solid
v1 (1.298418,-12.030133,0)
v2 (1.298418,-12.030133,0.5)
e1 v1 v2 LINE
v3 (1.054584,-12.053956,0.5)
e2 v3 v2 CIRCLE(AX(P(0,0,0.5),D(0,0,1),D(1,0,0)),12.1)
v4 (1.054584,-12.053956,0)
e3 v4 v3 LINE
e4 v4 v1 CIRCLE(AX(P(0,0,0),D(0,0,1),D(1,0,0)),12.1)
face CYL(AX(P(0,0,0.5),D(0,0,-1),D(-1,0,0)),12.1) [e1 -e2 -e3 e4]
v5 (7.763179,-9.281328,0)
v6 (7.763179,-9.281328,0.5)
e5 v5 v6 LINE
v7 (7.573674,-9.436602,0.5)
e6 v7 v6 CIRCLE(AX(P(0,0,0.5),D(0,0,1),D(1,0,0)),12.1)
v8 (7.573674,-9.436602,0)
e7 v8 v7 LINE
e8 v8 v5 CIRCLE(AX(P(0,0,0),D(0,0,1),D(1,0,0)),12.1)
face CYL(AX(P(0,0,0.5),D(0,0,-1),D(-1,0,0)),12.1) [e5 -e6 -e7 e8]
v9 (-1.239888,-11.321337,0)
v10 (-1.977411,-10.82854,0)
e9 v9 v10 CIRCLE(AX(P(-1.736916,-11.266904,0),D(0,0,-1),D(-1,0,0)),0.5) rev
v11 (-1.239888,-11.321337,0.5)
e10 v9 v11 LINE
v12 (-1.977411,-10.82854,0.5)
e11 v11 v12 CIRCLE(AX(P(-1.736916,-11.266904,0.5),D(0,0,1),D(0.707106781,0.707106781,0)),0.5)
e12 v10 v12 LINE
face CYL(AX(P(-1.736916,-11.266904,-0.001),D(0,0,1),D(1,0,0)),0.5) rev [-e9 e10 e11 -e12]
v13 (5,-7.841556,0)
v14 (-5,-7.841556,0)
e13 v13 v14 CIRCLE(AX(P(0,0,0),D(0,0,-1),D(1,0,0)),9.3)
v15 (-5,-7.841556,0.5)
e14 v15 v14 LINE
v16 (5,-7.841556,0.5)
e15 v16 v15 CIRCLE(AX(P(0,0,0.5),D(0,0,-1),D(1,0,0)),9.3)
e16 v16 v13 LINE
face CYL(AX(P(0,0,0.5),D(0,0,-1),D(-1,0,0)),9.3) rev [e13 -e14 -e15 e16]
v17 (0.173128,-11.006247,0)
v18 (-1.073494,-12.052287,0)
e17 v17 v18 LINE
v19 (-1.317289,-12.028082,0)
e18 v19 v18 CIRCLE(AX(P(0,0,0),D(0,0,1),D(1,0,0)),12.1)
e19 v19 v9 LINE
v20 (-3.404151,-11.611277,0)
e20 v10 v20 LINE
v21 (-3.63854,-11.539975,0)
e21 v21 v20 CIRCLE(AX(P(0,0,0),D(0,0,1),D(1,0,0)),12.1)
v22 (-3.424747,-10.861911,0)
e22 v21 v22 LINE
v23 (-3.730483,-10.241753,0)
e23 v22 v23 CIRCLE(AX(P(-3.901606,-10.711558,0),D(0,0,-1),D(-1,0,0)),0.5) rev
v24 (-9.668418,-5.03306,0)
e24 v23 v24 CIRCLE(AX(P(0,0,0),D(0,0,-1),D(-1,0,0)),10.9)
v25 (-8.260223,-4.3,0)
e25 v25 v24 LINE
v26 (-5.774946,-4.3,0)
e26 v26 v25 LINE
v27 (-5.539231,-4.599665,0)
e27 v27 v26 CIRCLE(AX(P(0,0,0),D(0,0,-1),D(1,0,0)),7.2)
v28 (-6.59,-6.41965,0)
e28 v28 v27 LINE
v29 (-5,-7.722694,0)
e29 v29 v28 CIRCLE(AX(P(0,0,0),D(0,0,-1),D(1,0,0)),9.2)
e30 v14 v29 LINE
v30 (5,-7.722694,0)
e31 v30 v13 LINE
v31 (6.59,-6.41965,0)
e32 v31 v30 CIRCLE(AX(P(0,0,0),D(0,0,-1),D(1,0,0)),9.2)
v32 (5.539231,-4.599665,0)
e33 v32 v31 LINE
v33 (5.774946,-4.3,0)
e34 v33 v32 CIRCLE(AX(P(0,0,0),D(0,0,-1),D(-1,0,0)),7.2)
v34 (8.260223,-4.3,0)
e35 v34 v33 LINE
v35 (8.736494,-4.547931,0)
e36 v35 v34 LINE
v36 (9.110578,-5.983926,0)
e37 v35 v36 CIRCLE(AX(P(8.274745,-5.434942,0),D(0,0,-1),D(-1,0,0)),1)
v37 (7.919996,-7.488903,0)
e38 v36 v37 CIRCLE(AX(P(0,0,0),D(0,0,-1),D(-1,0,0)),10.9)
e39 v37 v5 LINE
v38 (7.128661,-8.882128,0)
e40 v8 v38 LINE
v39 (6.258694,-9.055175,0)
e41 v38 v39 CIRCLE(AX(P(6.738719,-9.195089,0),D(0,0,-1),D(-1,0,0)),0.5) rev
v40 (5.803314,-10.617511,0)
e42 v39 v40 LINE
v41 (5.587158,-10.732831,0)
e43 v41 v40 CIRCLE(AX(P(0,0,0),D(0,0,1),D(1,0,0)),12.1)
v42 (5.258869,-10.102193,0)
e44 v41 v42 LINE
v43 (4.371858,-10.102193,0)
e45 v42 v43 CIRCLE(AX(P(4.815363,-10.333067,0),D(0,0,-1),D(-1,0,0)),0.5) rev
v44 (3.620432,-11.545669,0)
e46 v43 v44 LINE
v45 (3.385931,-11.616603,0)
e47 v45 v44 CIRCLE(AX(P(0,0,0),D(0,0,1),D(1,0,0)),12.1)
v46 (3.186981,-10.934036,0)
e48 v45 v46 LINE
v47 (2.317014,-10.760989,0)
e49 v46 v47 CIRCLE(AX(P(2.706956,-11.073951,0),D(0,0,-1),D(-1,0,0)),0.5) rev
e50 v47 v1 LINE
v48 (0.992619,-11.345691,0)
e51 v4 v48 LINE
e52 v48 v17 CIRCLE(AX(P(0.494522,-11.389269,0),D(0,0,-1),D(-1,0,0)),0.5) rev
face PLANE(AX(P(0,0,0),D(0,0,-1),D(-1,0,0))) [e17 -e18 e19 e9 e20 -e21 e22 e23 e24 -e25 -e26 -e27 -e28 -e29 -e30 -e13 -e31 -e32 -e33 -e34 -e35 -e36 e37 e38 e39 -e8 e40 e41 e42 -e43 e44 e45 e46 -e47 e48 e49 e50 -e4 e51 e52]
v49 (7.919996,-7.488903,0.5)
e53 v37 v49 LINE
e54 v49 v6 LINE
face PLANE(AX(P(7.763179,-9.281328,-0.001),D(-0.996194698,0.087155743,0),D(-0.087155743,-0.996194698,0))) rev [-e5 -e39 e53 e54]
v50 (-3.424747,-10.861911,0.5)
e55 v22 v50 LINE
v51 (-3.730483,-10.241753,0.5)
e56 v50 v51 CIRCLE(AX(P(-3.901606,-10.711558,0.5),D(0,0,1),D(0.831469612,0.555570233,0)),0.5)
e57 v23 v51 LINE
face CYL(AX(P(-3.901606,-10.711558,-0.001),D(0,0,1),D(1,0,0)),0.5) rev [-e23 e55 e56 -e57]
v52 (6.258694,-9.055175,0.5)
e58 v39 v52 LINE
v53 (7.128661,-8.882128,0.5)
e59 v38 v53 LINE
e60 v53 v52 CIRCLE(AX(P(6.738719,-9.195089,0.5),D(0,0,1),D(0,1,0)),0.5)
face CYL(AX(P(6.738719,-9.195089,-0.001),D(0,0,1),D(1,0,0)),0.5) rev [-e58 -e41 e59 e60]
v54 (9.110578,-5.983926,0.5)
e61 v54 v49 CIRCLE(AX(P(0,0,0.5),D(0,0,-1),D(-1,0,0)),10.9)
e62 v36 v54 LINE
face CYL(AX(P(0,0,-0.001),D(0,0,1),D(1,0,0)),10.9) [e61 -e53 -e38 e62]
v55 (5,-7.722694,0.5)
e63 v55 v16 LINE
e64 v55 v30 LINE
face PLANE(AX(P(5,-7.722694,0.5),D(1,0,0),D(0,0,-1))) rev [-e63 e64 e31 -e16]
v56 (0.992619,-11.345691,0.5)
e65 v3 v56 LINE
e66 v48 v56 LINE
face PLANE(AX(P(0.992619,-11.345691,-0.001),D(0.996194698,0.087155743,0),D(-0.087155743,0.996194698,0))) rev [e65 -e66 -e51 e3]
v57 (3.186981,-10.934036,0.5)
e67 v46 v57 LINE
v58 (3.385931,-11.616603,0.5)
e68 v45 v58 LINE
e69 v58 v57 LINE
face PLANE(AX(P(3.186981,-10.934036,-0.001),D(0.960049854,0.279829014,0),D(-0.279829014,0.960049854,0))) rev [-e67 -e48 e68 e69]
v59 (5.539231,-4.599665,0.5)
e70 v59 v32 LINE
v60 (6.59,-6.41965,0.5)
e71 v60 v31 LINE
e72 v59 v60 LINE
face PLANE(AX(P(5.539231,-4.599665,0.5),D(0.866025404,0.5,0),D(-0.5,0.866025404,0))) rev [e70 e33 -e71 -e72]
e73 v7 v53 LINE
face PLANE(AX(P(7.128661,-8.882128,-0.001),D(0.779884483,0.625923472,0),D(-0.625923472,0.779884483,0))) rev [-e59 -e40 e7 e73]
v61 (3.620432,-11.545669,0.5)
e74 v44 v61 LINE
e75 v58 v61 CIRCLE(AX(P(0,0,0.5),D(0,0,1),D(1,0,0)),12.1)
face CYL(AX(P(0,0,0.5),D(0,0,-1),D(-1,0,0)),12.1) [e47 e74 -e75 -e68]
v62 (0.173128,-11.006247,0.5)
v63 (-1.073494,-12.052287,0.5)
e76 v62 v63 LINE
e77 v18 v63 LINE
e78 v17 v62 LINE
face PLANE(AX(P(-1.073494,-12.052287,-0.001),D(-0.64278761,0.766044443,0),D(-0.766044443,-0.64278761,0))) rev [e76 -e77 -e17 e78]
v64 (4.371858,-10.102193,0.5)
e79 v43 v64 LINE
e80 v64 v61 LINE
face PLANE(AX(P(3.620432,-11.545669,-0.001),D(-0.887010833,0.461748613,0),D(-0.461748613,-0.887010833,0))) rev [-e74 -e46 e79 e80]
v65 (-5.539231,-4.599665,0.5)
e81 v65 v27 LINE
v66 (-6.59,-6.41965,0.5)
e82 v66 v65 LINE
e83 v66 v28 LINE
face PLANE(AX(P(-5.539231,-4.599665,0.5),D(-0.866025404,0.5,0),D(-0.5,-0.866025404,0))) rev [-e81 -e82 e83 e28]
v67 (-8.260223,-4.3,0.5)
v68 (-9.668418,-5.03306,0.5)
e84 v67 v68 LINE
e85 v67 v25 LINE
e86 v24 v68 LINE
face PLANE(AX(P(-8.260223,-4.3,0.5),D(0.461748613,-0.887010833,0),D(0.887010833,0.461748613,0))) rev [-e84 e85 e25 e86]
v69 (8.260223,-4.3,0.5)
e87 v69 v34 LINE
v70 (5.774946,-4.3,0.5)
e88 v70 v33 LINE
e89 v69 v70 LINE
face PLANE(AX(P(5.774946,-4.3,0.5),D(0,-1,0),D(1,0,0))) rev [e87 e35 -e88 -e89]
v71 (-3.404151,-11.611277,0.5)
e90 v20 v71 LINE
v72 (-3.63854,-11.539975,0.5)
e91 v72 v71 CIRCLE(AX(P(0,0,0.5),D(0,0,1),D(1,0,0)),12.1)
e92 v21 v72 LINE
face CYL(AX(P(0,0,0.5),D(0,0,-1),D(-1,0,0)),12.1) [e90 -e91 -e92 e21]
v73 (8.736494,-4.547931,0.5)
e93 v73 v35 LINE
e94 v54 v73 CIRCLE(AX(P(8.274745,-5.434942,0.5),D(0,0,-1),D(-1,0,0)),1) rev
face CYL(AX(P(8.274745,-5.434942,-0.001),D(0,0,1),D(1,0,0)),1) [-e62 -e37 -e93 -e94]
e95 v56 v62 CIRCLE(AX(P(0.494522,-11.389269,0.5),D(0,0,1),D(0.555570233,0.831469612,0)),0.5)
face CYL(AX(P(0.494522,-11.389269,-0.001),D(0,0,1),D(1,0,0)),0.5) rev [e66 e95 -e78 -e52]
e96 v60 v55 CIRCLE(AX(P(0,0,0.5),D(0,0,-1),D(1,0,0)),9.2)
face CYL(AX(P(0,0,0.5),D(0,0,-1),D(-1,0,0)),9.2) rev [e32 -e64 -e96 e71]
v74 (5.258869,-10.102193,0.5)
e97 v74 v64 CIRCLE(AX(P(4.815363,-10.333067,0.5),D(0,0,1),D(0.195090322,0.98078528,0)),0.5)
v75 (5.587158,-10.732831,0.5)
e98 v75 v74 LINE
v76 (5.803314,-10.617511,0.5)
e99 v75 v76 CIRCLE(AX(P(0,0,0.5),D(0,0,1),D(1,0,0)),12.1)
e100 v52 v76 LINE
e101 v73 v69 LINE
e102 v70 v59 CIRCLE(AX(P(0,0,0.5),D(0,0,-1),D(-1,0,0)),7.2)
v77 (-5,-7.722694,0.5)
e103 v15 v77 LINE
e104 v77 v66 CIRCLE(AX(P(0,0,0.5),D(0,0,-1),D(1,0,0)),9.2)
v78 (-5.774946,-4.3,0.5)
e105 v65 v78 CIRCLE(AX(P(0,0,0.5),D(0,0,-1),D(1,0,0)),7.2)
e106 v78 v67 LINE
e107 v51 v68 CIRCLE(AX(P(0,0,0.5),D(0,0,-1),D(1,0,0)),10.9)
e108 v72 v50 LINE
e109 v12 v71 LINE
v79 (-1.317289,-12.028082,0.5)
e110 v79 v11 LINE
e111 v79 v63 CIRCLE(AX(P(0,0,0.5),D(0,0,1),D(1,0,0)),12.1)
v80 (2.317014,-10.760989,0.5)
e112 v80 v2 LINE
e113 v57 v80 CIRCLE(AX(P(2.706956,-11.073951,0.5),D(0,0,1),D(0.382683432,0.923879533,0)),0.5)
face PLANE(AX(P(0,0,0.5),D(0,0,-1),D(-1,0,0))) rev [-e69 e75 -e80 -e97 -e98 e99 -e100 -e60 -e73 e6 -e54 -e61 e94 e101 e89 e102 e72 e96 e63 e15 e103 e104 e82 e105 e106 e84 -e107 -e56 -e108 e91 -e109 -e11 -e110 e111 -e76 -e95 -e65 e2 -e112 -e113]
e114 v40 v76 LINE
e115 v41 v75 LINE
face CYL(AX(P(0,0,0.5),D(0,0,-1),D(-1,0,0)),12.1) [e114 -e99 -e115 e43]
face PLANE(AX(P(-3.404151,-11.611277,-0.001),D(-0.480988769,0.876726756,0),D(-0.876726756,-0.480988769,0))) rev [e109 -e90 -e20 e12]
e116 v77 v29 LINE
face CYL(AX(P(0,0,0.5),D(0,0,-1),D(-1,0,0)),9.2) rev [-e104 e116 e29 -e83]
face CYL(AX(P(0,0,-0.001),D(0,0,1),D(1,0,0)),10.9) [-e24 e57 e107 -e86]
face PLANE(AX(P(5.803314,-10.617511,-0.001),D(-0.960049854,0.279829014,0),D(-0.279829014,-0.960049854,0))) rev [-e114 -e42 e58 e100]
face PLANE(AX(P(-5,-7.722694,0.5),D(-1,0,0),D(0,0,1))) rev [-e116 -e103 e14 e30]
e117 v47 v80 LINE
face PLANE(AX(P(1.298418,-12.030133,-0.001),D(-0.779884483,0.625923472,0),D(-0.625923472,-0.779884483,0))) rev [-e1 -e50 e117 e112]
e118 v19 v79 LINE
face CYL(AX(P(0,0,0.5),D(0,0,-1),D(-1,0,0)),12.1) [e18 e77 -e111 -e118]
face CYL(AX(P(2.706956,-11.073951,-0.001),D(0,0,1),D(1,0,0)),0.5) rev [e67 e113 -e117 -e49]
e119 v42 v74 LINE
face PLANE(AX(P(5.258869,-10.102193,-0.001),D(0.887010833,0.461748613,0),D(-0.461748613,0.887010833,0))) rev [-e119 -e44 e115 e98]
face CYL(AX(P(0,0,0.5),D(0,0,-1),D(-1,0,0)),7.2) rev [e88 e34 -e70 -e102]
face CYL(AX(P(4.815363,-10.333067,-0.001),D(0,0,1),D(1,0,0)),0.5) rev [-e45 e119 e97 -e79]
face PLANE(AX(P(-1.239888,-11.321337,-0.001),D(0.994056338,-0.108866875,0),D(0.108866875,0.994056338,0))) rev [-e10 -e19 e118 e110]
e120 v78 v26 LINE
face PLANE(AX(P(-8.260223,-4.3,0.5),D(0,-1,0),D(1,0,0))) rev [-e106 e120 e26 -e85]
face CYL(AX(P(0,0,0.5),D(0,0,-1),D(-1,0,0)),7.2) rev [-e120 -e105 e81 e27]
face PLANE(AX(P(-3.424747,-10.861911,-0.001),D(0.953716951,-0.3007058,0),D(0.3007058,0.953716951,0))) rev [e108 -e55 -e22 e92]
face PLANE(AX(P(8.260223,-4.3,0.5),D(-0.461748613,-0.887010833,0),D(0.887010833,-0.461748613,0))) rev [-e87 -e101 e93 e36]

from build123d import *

# Parameters (mm, degrees)
OTHER_10076_5_DEPTH = 0.5
CUT_EXTRUDE1_START  = -0.5
CUT_EXTRUDE1_DEPTH  = 0.5


# Read off the part's stored shape, not the designer's step: 10076-5
with BuildPart() as part:
    # Other 10076-5 outline → Other 10076-5 (new body)
    with BuildSketch(Plane.XY):
        with BuildLine():
            ThreePointArc((7.573674013, -9.436602245), (7.668819519, -9.359444812), (7.763179028, -9.281328104))
            Line((7.763179028, -9.281328104), (7.919995926, -7.488902759))
            ThreePointArc((7.919995926, -7.488902759), (8.548470738, -6.76266575), (9.110578105, -5.983925684))
            ThreePointArc((9.110578105, -5.983925684), (9.242448569, -5.182849851), (8.736493865, -4.547930843))
            Line((8.736493865, -4.547930843), (8.260223146, -4.3))
            Line((8.260223146, -4.3), (5.774945887, -4.3))
            ThreePointArc((5.774945887, -4.3), (5.659072475, -4.451392897), (5.53923133, -4.5996648))
            Line((5.53923133, -4.5996648), (6.59, -6.419649523))
            ThreePointArc((6.59, -6.419649523), (5.831509763, -7.1157216), (5, -7.722693831))
            Line((5, -7.722693831), (5, -7.841555968))
            ThreePointArc((5, -7.841555968), (0, -9.3), (-5, -7.841555968))
            Line((-5, -7.841555968), (-5, -7.722693831))
            ThreePointArc((-5, -7.722693831), (-5.831509763, -7.1157216), (-6.59, -6.419649523))
            Line((-6.59, -6.419649523), (-5.53923133, -4.5996648))
            ThreePointArc((-5.53923133, -4.5996648), (-5.659072475, -4.451392897), (-5.774945887, -4.3))
            Line((-5.774945887, -4.3), (-8.260223146, -4.3))
            Line((-8.260223146, -4.3), (-10.732831081, -5.58715822))
            ThreePointArc((-10.732831081, -5.58715822), (-10.675718173, -5.6955282), (-10.617511084, -5.803314431))
            Line((-10.617511084, -5.803314431), (-9.055174855, -6.258693914))
            ThreePointArc((-9.055174855, -6.258693914), (-8.704696722, -6.64117368), (-8.882127626, -7.128661083))
            Line((-8.882127626, -7.128661083), (-9.436602245, -7.573674013))
            ThreePointArc((-9.436602245, -7.573674013), (-9.359444812, -7.668819519), (-9.281328104, -7.763179028))
            Line((-9.281328104, -7.763179028), (-7.660171598, -7.905011844))
            ThreePointArc((-7.660171598, -7.905011844), (-7.241809703, -8.211767477), (-7.320727248, -8.724502998))
            Line((-7.320727248, -8.724502998), (-7.777730077, -9.269137762))
            ThreePointArc((-7.777730077, -9.269137762), (-7.683493234, -9.347402405), (-7.588468891, -9.424709008))
            Line((-7.588468891, -9.424709008), (-5.970792243, -9.247544602))
            ThreePointArc((-5.970792243, -9.247544602), (-5.500623999, -9.466787654), (-5.477995427, -9.985067155))
            Line((-5.477995427, -9.985067155), (-5.819964104, -10.608393744))
            ThreePointArc((-5.819964104, -10.608393744), (-5.712269322, -10.666769858), (-5.603989074, -10.724052707))
            Line((-5.603989074, -10.724052707), (-4.05195869, -10.234699407))
            ThreePointArc((-4.05195869, -10.234699407), (-3.548052399, -10.358004491), (-3.424747314, -10.861910782))
            Line((-3.424747314, -10.861910782), (-3.638540174, -11.539975104))
            ThreePointArc((-3.638540174, -11.539975104), (-3.521526102, -11.576219327), (-3.404151099, -11.611277074))
            Line((-3.404151099, -11.611277074), (-1.977410637, -10.828540453))
            ThreePointArc((-1.977410637, -10.828540453), (-1.459131136, -10.851169025), (-1.239888083, -11.321337268))
            Line((-1.239888083, -11.321337268), (-1.317289186, -12.028081692))
            ThreePointArc((-1.317289186, -12.028081692), (-1.195452609, -12.04080118), (-1.073493507, -12.052286575))
            Line((-1.073493507, -12.052286575), (0.173128198, -11.006246762))
            ThreePointArc((0.173128198, -11.006246762), (0.685863719, -10.927329218), (0.992619352, -11.345691113))
            Line((0.992619352, -11.345691113), (1.054584487, -12.053955847))
            ThreePointArc((1.054584487, -12.053955847), (1.176561457, -12.042661796), (1.298417839, -12.030133462))
            Line((1.298417839, -12.030133462), (2.317013814, -10.760989181))
            ThreePointArc((2.317013814, -10.760989181), (2.804501216, -10.583558277), (3.186980982, -10.93403641))
            Line((3.186980982, -10.93403641), (3.38593107, -11.616603238))
            ThreePointArc((3.38593107, -11.616603238), (3.503360927, -11.581729673), (3.620431715, -11.545669067))
            Line((3.620431715, -11.545669067), (4.371857887, -10.10219282))
            ThreePointArc((4.371857887, -10.10219282), (4.815363304, -9.833067127), (5.258868721, -10.10219282))
            Line((5.258868721, -10.10219282), (5.58715822, -10.732831081))
            ThreePointArc((5.58715822, -10.732831081), (5.6955282, -10.675718173), (5.803314431, -10.617511084))
            Line((5.803314431, -10.617511084), (6.258693914, -9.055174855))
            ThreePointArc((6.258693914, -9.055174855), (6.64117368, -8.704696722), (7.128661083, -8.882127626))
            Line((7.128661083, -8.882127626), (7.573674013, -9.436602245))
        make_face()
    extrude(amount=OTHER_10076_5_DEPTH)

    # Sketch1 → Cut-Extrude1 (cut)
    with BuildSketch(Plane.XY.offset(0.5).offset(CUT_EXTRUDE1_START)):
        with BuildLine():
            Line((-9.668418082, -5.033059884), (-10.732831081, -5.58715822))
            ThreePointArc((-10.732831081, -5.58715822), (-8.562700768, -8.549278073), (-5.603989074, -10.724052707))
            Line((-5.603989074, -10.724052707), (-4.05195869, -10.234699407))
            ThreePointArc((-4.05195869, -10.234699407), (-3.890638239, -10.211678184), (-3.730482729, -10.241752712))
            ThreePointArc((-3.730482729, -10.241752712), (-7.187854755, -8.19418965), (-9.668418082, -5.033059884))
        make_face()
    extrude(amount=CUT_EXTRUDE1_DEPTH, mode=Mode.SUBTRACT)


solid = part.part
